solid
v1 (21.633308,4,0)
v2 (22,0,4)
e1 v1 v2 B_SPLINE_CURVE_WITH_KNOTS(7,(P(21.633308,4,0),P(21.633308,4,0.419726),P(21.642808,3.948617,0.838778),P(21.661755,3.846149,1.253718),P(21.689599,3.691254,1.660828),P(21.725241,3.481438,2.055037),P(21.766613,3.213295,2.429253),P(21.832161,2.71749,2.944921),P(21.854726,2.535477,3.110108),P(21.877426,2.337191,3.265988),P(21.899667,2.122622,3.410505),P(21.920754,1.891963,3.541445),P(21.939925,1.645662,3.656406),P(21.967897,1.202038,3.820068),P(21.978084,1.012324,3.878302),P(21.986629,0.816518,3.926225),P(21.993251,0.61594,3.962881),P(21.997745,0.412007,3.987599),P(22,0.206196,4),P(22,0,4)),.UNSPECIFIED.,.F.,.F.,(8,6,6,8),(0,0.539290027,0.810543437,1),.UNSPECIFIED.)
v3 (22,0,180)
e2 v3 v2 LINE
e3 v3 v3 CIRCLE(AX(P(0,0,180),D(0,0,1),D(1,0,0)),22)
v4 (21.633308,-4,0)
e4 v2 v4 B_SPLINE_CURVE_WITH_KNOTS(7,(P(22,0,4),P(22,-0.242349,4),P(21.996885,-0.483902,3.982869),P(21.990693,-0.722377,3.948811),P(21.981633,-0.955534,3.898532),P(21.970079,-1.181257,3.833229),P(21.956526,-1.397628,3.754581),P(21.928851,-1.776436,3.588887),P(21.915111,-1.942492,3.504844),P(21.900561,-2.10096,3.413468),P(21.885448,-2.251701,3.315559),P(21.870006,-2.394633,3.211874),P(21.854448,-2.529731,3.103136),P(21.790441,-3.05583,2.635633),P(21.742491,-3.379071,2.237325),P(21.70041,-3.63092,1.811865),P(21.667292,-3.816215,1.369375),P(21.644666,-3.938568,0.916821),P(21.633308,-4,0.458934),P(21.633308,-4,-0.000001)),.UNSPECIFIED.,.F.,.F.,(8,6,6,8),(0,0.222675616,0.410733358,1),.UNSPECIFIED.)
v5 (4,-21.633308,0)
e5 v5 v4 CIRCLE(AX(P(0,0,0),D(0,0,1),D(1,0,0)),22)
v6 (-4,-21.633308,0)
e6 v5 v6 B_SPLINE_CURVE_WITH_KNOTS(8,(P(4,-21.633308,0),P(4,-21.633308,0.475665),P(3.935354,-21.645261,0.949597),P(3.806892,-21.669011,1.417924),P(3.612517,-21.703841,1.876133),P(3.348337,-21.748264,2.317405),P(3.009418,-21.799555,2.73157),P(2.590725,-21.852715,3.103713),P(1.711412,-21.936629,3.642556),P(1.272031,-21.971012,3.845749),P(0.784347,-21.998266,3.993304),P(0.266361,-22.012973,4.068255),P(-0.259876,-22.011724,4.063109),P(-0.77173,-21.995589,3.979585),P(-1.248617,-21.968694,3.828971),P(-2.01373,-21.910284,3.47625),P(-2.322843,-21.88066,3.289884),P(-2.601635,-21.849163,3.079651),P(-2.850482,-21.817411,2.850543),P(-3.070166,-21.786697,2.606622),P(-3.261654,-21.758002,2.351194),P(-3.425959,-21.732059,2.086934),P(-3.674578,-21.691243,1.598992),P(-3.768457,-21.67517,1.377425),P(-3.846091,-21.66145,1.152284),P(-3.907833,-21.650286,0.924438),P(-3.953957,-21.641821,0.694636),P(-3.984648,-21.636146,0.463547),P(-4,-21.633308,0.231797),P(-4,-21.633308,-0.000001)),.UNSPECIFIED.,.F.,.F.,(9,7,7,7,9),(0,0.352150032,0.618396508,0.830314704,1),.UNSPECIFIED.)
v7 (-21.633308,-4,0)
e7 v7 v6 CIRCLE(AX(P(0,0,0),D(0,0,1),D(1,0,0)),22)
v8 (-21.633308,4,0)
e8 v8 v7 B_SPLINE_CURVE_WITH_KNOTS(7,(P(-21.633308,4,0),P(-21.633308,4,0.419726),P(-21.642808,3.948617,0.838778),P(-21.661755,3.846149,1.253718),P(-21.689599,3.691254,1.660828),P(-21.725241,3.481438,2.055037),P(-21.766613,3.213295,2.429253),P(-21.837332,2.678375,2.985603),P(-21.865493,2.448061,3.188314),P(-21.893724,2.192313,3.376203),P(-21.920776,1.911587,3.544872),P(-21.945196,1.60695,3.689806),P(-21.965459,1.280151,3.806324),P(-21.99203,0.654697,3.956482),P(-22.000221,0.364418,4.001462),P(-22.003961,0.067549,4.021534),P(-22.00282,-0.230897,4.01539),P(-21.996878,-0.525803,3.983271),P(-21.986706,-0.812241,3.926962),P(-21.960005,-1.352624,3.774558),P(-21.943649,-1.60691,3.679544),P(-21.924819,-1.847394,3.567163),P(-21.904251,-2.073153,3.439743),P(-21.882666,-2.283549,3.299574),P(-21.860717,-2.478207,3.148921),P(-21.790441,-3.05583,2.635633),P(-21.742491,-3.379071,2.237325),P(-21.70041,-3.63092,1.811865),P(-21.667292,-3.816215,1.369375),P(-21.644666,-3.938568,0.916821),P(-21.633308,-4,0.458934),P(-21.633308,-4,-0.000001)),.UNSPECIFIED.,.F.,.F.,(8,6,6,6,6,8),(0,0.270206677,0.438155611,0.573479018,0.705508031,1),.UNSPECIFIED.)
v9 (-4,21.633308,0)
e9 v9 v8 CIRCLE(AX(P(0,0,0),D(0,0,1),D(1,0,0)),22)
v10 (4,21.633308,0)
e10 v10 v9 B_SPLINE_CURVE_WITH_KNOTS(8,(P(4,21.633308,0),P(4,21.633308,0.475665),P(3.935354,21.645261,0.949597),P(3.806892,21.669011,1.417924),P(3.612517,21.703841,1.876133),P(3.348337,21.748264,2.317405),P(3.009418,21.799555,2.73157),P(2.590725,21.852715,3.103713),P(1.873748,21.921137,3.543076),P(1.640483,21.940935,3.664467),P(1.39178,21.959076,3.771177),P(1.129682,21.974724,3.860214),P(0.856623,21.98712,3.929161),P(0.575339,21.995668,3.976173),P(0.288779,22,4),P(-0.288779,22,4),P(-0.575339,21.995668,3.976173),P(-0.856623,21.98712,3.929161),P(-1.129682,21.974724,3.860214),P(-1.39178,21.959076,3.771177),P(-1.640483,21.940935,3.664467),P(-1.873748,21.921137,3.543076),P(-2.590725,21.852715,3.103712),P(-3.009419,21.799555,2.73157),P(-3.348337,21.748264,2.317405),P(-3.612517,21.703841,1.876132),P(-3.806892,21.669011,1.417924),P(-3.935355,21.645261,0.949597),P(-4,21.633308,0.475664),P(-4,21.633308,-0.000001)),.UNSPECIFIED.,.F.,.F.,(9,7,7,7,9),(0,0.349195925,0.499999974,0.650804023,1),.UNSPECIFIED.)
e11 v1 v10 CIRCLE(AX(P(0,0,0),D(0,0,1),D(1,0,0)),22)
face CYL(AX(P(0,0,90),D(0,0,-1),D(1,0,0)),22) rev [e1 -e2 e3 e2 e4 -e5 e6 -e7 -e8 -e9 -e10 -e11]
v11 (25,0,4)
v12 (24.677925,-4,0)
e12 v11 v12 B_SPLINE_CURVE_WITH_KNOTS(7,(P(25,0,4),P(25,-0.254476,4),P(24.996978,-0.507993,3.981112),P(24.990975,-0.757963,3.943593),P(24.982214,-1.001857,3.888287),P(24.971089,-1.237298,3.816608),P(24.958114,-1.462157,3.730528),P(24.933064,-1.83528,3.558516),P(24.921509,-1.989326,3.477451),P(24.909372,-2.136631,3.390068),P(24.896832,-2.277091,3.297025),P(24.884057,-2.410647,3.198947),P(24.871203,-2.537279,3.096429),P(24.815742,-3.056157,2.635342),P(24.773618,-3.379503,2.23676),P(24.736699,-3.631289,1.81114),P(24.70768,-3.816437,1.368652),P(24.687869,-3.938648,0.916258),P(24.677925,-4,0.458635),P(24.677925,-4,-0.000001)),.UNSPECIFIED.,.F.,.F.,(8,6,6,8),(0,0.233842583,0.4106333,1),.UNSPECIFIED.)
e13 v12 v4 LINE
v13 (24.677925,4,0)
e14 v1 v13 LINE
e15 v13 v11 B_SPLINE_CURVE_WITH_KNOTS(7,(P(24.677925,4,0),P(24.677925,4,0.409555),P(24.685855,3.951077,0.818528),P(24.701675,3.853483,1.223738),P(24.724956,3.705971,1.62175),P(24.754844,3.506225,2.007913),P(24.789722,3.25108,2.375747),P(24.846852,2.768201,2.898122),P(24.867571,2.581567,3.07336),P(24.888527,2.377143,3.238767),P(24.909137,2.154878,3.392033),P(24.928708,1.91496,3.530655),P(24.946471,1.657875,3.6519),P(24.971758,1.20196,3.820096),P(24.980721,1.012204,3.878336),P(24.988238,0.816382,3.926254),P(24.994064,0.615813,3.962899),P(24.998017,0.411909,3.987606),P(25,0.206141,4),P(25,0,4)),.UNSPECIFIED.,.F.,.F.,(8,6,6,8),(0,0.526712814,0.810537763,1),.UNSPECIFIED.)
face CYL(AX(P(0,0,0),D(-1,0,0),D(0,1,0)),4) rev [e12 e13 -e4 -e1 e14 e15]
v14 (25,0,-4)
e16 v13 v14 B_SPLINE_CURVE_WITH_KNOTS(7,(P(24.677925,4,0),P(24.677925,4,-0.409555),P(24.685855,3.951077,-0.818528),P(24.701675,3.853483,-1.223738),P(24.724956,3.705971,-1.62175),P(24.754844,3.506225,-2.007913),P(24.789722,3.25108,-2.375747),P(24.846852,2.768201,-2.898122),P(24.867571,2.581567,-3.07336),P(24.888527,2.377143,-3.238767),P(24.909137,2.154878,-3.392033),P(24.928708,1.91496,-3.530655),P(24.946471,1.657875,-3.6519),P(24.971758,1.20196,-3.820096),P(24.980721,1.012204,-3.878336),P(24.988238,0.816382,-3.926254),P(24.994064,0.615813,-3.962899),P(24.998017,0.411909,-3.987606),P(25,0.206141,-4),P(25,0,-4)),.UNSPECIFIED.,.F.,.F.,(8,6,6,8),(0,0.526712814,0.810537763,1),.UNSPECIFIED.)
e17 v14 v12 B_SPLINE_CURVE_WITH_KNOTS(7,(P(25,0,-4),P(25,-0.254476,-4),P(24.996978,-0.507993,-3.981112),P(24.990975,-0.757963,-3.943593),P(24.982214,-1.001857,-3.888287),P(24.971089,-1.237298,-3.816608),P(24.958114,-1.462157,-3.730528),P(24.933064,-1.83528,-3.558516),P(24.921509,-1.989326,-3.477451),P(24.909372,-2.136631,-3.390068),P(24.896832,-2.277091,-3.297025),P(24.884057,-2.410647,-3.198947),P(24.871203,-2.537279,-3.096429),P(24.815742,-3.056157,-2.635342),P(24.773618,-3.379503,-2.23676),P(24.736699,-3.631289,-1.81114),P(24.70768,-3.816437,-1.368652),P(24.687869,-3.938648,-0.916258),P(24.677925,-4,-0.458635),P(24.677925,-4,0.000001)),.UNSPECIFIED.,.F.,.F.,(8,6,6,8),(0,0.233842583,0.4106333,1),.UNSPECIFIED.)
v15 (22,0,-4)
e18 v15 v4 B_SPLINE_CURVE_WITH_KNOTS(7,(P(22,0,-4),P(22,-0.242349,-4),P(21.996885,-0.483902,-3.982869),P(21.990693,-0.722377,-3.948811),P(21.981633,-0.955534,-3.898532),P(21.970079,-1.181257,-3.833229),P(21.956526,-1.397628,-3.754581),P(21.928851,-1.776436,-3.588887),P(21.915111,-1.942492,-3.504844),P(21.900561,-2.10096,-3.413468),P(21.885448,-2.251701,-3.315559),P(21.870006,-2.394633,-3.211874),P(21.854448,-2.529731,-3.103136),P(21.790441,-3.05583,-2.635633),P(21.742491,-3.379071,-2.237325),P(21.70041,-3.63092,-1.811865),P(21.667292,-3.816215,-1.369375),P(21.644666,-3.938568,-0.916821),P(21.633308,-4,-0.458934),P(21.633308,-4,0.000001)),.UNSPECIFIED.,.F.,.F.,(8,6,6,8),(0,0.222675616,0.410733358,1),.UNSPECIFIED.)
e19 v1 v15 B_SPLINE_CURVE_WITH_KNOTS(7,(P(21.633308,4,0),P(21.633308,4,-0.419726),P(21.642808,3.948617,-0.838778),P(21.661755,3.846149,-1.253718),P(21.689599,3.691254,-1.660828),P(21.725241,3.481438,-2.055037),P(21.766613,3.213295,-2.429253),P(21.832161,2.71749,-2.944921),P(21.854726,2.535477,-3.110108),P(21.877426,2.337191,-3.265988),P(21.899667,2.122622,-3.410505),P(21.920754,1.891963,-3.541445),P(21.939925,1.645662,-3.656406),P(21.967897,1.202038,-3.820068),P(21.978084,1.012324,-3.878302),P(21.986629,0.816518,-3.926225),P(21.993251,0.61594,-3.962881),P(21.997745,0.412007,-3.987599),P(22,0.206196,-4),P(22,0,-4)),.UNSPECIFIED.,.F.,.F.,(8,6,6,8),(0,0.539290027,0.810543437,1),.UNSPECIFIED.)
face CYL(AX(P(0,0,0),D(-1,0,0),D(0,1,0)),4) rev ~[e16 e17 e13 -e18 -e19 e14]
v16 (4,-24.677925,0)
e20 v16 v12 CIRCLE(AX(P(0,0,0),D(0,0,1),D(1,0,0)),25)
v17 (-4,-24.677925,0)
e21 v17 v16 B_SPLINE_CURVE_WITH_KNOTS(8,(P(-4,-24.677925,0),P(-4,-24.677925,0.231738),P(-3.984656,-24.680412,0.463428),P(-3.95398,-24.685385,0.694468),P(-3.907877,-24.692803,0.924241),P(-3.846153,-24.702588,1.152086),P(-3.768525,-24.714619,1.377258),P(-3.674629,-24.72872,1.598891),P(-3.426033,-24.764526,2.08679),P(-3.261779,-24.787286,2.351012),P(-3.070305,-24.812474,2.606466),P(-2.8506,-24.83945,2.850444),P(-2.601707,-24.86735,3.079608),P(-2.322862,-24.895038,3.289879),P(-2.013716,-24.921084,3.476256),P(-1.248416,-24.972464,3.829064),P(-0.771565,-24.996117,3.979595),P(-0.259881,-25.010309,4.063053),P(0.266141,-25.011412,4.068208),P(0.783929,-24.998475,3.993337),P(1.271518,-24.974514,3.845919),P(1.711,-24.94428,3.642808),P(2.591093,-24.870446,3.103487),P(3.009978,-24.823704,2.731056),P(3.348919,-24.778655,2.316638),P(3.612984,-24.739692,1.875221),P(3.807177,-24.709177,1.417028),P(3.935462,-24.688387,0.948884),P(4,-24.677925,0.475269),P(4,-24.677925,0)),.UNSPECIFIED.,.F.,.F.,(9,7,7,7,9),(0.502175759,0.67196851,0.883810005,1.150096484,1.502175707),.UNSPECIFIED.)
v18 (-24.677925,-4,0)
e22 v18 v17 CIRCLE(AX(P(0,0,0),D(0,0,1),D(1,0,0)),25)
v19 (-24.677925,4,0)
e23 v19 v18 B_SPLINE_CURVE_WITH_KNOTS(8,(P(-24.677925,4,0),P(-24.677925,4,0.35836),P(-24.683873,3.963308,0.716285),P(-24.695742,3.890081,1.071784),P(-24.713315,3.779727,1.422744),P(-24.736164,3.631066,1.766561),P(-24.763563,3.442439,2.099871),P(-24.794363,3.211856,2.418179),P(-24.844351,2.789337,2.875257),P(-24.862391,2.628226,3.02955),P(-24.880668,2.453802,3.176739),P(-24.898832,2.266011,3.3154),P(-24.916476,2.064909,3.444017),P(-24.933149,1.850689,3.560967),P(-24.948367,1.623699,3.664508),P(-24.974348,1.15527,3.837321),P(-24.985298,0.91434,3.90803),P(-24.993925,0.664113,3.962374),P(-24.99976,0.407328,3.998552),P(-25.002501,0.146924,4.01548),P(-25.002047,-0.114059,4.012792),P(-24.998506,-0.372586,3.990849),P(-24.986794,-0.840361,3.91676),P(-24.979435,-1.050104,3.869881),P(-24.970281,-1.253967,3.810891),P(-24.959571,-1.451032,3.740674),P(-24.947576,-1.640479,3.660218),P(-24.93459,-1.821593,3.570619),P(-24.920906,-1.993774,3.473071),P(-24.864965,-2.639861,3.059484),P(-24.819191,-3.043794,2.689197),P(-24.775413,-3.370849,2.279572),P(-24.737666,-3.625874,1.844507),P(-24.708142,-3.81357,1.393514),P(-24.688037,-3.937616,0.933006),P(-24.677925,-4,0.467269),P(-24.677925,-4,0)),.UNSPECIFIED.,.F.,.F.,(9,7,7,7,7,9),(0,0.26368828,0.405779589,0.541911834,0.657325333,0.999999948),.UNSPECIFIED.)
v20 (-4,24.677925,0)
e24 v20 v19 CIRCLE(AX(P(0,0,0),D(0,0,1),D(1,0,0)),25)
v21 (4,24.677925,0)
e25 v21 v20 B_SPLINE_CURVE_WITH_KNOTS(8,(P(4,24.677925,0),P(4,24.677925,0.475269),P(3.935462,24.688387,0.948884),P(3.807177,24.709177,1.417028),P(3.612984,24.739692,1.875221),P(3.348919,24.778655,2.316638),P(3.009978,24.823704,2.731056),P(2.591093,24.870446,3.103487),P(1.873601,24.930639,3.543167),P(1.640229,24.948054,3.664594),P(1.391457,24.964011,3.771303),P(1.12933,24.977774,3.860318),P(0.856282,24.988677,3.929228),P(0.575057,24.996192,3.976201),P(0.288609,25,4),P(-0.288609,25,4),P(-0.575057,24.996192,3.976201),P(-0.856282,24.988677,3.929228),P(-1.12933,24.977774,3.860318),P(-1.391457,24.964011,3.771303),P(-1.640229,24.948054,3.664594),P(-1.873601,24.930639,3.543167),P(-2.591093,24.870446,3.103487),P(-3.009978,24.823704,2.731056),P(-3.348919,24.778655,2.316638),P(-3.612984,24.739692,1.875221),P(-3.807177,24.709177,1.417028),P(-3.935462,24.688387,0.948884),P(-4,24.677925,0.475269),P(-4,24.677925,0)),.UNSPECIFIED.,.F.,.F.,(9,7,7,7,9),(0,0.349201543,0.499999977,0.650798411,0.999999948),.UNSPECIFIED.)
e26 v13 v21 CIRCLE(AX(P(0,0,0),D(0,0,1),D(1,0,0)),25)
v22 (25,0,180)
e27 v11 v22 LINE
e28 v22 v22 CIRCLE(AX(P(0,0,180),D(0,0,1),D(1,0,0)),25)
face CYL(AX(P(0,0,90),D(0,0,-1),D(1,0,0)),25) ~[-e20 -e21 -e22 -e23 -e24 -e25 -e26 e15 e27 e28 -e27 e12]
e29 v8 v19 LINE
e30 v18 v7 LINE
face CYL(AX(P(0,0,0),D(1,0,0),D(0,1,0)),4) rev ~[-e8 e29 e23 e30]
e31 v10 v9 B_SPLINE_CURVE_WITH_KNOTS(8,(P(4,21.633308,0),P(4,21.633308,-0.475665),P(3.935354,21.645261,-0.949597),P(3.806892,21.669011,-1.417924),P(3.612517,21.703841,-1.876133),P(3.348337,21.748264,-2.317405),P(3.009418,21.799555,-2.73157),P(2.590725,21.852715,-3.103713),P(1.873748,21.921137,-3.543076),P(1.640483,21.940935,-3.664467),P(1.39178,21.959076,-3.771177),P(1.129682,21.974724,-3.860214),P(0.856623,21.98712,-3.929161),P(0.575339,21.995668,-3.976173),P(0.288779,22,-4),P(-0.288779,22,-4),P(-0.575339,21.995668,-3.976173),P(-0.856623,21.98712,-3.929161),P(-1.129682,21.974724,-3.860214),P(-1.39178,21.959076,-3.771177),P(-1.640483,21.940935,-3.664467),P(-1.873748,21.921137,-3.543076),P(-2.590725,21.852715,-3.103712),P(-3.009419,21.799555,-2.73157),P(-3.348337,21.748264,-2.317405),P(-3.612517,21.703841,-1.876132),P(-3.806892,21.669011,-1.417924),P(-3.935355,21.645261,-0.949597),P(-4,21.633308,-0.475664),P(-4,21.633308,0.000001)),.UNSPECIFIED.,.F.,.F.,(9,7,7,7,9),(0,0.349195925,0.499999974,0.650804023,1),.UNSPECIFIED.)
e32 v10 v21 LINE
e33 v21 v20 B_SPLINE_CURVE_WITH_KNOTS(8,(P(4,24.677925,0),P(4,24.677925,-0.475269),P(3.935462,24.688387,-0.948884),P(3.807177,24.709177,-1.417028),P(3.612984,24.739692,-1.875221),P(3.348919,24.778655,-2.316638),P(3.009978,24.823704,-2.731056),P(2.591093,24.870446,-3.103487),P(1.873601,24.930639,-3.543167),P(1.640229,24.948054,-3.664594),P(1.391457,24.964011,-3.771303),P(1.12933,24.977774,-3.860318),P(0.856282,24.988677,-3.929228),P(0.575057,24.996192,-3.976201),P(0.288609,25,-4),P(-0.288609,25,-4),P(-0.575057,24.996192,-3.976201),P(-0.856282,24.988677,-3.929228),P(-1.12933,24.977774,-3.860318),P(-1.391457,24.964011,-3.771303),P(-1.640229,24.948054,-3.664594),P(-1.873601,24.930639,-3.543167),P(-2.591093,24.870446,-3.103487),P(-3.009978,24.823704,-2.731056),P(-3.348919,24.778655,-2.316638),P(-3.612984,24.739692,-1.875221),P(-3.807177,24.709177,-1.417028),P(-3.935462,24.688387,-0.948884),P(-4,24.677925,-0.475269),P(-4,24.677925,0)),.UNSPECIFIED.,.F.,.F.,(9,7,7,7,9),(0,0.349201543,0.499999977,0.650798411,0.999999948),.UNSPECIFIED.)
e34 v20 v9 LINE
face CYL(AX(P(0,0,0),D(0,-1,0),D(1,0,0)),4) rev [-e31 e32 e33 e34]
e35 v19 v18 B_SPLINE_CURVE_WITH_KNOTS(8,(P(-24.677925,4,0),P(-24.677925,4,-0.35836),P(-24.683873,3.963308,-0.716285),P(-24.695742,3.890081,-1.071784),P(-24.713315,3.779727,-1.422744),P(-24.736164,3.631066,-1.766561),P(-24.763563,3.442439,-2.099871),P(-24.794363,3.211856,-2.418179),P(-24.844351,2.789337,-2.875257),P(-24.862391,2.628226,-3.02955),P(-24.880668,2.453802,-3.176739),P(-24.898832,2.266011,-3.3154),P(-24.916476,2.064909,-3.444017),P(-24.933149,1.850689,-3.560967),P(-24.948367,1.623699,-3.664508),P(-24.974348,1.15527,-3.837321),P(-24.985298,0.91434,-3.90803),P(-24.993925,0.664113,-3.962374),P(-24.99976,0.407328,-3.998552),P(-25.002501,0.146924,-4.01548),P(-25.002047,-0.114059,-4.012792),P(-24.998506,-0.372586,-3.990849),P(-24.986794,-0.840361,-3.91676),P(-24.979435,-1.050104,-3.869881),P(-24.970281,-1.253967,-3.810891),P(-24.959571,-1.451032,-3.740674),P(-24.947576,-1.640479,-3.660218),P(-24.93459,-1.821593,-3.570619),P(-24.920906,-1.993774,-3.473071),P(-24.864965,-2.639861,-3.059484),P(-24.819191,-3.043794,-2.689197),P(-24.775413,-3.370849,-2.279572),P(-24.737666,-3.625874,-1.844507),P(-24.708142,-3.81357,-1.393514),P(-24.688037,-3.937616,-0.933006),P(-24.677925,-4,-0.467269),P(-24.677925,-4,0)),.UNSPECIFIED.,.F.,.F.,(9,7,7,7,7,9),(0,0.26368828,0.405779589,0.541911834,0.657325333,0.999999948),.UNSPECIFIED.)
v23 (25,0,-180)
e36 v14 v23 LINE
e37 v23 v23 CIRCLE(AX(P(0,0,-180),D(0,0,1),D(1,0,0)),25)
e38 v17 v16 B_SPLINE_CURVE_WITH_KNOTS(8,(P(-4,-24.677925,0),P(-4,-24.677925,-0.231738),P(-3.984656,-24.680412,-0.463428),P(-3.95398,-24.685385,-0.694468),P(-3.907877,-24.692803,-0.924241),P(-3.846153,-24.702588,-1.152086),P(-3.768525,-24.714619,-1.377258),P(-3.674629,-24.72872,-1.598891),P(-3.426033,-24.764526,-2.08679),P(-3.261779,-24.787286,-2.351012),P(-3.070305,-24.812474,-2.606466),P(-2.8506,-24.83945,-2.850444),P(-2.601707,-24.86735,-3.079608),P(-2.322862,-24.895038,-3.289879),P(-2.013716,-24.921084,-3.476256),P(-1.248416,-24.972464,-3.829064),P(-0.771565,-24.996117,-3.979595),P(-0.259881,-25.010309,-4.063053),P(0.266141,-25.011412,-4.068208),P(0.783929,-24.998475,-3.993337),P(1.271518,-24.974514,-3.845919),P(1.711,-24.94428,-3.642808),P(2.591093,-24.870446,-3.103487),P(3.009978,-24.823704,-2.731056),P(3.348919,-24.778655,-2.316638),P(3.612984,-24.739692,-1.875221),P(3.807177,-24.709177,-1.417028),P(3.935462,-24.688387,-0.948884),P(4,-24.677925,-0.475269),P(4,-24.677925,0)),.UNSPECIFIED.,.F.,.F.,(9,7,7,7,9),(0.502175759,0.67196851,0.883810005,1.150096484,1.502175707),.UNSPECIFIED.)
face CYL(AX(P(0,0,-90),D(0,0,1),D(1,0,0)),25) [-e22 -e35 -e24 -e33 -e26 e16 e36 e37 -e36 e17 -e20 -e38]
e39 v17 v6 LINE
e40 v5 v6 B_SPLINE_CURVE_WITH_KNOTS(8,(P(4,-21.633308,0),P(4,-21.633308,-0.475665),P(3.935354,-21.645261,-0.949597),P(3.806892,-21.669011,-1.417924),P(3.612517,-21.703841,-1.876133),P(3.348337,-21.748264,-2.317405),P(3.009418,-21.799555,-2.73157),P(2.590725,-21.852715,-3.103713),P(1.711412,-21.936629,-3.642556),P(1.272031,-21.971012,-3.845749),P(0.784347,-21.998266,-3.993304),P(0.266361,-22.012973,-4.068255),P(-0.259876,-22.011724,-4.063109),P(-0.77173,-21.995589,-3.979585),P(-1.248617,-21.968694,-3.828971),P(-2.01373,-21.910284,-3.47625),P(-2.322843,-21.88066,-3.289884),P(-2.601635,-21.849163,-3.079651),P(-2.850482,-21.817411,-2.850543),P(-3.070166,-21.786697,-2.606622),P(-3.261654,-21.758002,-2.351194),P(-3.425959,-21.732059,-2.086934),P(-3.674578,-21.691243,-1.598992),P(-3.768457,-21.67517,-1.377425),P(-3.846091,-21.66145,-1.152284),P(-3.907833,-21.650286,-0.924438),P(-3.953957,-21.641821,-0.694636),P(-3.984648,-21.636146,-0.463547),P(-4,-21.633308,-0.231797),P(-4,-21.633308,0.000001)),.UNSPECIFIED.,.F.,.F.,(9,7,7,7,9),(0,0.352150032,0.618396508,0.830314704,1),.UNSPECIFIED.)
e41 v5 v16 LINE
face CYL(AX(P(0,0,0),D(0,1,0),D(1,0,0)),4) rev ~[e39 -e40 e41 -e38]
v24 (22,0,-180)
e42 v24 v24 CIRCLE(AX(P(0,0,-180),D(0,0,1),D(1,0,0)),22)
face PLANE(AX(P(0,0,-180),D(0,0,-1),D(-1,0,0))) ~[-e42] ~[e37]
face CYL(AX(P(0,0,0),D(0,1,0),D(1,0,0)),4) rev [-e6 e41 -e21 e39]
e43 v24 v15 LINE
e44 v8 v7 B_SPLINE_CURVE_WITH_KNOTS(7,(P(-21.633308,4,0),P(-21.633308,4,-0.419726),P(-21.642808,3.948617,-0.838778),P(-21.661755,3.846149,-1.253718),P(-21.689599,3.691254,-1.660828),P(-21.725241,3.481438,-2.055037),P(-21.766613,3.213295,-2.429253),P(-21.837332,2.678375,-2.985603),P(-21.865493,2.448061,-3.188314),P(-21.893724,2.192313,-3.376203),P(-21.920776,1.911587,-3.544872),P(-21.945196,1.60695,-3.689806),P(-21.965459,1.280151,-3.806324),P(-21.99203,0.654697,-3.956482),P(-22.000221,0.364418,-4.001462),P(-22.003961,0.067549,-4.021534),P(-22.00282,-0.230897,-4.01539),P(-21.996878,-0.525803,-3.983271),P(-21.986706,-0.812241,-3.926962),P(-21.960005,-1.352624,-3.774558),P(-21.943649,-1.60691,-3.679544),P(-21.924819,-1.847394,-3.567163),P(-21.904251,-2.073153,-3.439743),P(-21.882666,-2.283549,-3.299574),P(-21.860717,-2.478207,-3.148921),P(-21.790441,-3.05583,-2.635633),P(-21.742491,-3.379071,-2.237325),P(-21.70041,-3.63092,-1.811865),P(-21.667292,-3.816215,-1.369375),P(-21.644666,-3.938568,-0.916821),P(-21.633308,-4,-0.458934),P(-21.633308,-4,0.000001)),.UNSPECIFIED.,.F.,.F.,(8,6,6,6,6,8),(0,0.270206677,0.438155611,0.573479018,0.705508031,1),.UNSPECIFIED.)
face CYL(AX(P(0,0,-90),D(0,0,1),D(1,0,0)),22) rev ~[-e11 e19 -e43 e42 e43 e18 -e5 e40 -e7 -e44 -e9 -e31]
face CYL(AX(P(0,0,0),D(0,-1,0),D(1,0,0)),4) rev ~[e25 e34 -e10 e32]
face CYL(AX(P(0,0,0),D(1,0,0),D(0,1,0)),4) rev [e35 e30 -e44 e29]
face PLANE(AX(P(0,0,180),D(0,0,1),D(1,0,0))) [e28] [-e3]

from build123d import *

# Parameters (mm, degrees)
F0_R     = 25
F0_R_2   = 22
F1_DEPTH = 90
F2_DEPTH = 90
F3_R     = 4
F4_DEPTH = 25
F5_DEPTH = 25
F6_R     = 4
F7_DEPTH = 25
F8_DEPTH = 25


# Not quite as in the source:
# - a feature names something its author has since deleted; it is built from what else it names


with BuildPart() as f1:
    # F0 (on Top) → F1 (new body)
    with BuildSketch(Plane.XY):
        Circle(F0_R)
        Circle(F0_R_2, mode=Mode.SUBTRACT)
    extrude(amount=F1_DEPTH)

    # F2 (add): a face of the model
    f2_faces = [f1.faces().sort_by_distance(p)[0] for p in [
        (-24.2928932188, 0, 90),
    ]]
    extrude(f2_faces, amount=F2_DEPTH)

    # F3 (on Right) → F4 (cut)
    with BuildSketch(Plane.YZ):
        Circle(F3_R)
    extrude(amount=F4_DEPTH, mode=Mode.SUBTRACT)

    # F3 (on Right) → F5 (cut)
    with BuildSketch(Plane.YZ):
        Circle(F3_R)
    extrude(amount=-F5_DEPTH, mode=Mode.SUBTRACT)

    # F6 (on Front) → F7 (cut)
    with BuildSketch(Plane.XZ):
        Circle(F6_R)
    extrude(amount=F7_DEPTH, mode=Mode.SUBTRACT)

    # F6 (on Front) → F8 (cut)
    with BuildSketch(Plane.XZ):
        Circle(F6_R)
    extrude(amount=-F8_DEPTH, mode=Mode.SUBTRACT)

    # F9: F1 across plane


with BuildPart() as f1_1:
    add(f1.part)
    add(f1.part.mirror(Plane.XY))


solid = f1_1.part
